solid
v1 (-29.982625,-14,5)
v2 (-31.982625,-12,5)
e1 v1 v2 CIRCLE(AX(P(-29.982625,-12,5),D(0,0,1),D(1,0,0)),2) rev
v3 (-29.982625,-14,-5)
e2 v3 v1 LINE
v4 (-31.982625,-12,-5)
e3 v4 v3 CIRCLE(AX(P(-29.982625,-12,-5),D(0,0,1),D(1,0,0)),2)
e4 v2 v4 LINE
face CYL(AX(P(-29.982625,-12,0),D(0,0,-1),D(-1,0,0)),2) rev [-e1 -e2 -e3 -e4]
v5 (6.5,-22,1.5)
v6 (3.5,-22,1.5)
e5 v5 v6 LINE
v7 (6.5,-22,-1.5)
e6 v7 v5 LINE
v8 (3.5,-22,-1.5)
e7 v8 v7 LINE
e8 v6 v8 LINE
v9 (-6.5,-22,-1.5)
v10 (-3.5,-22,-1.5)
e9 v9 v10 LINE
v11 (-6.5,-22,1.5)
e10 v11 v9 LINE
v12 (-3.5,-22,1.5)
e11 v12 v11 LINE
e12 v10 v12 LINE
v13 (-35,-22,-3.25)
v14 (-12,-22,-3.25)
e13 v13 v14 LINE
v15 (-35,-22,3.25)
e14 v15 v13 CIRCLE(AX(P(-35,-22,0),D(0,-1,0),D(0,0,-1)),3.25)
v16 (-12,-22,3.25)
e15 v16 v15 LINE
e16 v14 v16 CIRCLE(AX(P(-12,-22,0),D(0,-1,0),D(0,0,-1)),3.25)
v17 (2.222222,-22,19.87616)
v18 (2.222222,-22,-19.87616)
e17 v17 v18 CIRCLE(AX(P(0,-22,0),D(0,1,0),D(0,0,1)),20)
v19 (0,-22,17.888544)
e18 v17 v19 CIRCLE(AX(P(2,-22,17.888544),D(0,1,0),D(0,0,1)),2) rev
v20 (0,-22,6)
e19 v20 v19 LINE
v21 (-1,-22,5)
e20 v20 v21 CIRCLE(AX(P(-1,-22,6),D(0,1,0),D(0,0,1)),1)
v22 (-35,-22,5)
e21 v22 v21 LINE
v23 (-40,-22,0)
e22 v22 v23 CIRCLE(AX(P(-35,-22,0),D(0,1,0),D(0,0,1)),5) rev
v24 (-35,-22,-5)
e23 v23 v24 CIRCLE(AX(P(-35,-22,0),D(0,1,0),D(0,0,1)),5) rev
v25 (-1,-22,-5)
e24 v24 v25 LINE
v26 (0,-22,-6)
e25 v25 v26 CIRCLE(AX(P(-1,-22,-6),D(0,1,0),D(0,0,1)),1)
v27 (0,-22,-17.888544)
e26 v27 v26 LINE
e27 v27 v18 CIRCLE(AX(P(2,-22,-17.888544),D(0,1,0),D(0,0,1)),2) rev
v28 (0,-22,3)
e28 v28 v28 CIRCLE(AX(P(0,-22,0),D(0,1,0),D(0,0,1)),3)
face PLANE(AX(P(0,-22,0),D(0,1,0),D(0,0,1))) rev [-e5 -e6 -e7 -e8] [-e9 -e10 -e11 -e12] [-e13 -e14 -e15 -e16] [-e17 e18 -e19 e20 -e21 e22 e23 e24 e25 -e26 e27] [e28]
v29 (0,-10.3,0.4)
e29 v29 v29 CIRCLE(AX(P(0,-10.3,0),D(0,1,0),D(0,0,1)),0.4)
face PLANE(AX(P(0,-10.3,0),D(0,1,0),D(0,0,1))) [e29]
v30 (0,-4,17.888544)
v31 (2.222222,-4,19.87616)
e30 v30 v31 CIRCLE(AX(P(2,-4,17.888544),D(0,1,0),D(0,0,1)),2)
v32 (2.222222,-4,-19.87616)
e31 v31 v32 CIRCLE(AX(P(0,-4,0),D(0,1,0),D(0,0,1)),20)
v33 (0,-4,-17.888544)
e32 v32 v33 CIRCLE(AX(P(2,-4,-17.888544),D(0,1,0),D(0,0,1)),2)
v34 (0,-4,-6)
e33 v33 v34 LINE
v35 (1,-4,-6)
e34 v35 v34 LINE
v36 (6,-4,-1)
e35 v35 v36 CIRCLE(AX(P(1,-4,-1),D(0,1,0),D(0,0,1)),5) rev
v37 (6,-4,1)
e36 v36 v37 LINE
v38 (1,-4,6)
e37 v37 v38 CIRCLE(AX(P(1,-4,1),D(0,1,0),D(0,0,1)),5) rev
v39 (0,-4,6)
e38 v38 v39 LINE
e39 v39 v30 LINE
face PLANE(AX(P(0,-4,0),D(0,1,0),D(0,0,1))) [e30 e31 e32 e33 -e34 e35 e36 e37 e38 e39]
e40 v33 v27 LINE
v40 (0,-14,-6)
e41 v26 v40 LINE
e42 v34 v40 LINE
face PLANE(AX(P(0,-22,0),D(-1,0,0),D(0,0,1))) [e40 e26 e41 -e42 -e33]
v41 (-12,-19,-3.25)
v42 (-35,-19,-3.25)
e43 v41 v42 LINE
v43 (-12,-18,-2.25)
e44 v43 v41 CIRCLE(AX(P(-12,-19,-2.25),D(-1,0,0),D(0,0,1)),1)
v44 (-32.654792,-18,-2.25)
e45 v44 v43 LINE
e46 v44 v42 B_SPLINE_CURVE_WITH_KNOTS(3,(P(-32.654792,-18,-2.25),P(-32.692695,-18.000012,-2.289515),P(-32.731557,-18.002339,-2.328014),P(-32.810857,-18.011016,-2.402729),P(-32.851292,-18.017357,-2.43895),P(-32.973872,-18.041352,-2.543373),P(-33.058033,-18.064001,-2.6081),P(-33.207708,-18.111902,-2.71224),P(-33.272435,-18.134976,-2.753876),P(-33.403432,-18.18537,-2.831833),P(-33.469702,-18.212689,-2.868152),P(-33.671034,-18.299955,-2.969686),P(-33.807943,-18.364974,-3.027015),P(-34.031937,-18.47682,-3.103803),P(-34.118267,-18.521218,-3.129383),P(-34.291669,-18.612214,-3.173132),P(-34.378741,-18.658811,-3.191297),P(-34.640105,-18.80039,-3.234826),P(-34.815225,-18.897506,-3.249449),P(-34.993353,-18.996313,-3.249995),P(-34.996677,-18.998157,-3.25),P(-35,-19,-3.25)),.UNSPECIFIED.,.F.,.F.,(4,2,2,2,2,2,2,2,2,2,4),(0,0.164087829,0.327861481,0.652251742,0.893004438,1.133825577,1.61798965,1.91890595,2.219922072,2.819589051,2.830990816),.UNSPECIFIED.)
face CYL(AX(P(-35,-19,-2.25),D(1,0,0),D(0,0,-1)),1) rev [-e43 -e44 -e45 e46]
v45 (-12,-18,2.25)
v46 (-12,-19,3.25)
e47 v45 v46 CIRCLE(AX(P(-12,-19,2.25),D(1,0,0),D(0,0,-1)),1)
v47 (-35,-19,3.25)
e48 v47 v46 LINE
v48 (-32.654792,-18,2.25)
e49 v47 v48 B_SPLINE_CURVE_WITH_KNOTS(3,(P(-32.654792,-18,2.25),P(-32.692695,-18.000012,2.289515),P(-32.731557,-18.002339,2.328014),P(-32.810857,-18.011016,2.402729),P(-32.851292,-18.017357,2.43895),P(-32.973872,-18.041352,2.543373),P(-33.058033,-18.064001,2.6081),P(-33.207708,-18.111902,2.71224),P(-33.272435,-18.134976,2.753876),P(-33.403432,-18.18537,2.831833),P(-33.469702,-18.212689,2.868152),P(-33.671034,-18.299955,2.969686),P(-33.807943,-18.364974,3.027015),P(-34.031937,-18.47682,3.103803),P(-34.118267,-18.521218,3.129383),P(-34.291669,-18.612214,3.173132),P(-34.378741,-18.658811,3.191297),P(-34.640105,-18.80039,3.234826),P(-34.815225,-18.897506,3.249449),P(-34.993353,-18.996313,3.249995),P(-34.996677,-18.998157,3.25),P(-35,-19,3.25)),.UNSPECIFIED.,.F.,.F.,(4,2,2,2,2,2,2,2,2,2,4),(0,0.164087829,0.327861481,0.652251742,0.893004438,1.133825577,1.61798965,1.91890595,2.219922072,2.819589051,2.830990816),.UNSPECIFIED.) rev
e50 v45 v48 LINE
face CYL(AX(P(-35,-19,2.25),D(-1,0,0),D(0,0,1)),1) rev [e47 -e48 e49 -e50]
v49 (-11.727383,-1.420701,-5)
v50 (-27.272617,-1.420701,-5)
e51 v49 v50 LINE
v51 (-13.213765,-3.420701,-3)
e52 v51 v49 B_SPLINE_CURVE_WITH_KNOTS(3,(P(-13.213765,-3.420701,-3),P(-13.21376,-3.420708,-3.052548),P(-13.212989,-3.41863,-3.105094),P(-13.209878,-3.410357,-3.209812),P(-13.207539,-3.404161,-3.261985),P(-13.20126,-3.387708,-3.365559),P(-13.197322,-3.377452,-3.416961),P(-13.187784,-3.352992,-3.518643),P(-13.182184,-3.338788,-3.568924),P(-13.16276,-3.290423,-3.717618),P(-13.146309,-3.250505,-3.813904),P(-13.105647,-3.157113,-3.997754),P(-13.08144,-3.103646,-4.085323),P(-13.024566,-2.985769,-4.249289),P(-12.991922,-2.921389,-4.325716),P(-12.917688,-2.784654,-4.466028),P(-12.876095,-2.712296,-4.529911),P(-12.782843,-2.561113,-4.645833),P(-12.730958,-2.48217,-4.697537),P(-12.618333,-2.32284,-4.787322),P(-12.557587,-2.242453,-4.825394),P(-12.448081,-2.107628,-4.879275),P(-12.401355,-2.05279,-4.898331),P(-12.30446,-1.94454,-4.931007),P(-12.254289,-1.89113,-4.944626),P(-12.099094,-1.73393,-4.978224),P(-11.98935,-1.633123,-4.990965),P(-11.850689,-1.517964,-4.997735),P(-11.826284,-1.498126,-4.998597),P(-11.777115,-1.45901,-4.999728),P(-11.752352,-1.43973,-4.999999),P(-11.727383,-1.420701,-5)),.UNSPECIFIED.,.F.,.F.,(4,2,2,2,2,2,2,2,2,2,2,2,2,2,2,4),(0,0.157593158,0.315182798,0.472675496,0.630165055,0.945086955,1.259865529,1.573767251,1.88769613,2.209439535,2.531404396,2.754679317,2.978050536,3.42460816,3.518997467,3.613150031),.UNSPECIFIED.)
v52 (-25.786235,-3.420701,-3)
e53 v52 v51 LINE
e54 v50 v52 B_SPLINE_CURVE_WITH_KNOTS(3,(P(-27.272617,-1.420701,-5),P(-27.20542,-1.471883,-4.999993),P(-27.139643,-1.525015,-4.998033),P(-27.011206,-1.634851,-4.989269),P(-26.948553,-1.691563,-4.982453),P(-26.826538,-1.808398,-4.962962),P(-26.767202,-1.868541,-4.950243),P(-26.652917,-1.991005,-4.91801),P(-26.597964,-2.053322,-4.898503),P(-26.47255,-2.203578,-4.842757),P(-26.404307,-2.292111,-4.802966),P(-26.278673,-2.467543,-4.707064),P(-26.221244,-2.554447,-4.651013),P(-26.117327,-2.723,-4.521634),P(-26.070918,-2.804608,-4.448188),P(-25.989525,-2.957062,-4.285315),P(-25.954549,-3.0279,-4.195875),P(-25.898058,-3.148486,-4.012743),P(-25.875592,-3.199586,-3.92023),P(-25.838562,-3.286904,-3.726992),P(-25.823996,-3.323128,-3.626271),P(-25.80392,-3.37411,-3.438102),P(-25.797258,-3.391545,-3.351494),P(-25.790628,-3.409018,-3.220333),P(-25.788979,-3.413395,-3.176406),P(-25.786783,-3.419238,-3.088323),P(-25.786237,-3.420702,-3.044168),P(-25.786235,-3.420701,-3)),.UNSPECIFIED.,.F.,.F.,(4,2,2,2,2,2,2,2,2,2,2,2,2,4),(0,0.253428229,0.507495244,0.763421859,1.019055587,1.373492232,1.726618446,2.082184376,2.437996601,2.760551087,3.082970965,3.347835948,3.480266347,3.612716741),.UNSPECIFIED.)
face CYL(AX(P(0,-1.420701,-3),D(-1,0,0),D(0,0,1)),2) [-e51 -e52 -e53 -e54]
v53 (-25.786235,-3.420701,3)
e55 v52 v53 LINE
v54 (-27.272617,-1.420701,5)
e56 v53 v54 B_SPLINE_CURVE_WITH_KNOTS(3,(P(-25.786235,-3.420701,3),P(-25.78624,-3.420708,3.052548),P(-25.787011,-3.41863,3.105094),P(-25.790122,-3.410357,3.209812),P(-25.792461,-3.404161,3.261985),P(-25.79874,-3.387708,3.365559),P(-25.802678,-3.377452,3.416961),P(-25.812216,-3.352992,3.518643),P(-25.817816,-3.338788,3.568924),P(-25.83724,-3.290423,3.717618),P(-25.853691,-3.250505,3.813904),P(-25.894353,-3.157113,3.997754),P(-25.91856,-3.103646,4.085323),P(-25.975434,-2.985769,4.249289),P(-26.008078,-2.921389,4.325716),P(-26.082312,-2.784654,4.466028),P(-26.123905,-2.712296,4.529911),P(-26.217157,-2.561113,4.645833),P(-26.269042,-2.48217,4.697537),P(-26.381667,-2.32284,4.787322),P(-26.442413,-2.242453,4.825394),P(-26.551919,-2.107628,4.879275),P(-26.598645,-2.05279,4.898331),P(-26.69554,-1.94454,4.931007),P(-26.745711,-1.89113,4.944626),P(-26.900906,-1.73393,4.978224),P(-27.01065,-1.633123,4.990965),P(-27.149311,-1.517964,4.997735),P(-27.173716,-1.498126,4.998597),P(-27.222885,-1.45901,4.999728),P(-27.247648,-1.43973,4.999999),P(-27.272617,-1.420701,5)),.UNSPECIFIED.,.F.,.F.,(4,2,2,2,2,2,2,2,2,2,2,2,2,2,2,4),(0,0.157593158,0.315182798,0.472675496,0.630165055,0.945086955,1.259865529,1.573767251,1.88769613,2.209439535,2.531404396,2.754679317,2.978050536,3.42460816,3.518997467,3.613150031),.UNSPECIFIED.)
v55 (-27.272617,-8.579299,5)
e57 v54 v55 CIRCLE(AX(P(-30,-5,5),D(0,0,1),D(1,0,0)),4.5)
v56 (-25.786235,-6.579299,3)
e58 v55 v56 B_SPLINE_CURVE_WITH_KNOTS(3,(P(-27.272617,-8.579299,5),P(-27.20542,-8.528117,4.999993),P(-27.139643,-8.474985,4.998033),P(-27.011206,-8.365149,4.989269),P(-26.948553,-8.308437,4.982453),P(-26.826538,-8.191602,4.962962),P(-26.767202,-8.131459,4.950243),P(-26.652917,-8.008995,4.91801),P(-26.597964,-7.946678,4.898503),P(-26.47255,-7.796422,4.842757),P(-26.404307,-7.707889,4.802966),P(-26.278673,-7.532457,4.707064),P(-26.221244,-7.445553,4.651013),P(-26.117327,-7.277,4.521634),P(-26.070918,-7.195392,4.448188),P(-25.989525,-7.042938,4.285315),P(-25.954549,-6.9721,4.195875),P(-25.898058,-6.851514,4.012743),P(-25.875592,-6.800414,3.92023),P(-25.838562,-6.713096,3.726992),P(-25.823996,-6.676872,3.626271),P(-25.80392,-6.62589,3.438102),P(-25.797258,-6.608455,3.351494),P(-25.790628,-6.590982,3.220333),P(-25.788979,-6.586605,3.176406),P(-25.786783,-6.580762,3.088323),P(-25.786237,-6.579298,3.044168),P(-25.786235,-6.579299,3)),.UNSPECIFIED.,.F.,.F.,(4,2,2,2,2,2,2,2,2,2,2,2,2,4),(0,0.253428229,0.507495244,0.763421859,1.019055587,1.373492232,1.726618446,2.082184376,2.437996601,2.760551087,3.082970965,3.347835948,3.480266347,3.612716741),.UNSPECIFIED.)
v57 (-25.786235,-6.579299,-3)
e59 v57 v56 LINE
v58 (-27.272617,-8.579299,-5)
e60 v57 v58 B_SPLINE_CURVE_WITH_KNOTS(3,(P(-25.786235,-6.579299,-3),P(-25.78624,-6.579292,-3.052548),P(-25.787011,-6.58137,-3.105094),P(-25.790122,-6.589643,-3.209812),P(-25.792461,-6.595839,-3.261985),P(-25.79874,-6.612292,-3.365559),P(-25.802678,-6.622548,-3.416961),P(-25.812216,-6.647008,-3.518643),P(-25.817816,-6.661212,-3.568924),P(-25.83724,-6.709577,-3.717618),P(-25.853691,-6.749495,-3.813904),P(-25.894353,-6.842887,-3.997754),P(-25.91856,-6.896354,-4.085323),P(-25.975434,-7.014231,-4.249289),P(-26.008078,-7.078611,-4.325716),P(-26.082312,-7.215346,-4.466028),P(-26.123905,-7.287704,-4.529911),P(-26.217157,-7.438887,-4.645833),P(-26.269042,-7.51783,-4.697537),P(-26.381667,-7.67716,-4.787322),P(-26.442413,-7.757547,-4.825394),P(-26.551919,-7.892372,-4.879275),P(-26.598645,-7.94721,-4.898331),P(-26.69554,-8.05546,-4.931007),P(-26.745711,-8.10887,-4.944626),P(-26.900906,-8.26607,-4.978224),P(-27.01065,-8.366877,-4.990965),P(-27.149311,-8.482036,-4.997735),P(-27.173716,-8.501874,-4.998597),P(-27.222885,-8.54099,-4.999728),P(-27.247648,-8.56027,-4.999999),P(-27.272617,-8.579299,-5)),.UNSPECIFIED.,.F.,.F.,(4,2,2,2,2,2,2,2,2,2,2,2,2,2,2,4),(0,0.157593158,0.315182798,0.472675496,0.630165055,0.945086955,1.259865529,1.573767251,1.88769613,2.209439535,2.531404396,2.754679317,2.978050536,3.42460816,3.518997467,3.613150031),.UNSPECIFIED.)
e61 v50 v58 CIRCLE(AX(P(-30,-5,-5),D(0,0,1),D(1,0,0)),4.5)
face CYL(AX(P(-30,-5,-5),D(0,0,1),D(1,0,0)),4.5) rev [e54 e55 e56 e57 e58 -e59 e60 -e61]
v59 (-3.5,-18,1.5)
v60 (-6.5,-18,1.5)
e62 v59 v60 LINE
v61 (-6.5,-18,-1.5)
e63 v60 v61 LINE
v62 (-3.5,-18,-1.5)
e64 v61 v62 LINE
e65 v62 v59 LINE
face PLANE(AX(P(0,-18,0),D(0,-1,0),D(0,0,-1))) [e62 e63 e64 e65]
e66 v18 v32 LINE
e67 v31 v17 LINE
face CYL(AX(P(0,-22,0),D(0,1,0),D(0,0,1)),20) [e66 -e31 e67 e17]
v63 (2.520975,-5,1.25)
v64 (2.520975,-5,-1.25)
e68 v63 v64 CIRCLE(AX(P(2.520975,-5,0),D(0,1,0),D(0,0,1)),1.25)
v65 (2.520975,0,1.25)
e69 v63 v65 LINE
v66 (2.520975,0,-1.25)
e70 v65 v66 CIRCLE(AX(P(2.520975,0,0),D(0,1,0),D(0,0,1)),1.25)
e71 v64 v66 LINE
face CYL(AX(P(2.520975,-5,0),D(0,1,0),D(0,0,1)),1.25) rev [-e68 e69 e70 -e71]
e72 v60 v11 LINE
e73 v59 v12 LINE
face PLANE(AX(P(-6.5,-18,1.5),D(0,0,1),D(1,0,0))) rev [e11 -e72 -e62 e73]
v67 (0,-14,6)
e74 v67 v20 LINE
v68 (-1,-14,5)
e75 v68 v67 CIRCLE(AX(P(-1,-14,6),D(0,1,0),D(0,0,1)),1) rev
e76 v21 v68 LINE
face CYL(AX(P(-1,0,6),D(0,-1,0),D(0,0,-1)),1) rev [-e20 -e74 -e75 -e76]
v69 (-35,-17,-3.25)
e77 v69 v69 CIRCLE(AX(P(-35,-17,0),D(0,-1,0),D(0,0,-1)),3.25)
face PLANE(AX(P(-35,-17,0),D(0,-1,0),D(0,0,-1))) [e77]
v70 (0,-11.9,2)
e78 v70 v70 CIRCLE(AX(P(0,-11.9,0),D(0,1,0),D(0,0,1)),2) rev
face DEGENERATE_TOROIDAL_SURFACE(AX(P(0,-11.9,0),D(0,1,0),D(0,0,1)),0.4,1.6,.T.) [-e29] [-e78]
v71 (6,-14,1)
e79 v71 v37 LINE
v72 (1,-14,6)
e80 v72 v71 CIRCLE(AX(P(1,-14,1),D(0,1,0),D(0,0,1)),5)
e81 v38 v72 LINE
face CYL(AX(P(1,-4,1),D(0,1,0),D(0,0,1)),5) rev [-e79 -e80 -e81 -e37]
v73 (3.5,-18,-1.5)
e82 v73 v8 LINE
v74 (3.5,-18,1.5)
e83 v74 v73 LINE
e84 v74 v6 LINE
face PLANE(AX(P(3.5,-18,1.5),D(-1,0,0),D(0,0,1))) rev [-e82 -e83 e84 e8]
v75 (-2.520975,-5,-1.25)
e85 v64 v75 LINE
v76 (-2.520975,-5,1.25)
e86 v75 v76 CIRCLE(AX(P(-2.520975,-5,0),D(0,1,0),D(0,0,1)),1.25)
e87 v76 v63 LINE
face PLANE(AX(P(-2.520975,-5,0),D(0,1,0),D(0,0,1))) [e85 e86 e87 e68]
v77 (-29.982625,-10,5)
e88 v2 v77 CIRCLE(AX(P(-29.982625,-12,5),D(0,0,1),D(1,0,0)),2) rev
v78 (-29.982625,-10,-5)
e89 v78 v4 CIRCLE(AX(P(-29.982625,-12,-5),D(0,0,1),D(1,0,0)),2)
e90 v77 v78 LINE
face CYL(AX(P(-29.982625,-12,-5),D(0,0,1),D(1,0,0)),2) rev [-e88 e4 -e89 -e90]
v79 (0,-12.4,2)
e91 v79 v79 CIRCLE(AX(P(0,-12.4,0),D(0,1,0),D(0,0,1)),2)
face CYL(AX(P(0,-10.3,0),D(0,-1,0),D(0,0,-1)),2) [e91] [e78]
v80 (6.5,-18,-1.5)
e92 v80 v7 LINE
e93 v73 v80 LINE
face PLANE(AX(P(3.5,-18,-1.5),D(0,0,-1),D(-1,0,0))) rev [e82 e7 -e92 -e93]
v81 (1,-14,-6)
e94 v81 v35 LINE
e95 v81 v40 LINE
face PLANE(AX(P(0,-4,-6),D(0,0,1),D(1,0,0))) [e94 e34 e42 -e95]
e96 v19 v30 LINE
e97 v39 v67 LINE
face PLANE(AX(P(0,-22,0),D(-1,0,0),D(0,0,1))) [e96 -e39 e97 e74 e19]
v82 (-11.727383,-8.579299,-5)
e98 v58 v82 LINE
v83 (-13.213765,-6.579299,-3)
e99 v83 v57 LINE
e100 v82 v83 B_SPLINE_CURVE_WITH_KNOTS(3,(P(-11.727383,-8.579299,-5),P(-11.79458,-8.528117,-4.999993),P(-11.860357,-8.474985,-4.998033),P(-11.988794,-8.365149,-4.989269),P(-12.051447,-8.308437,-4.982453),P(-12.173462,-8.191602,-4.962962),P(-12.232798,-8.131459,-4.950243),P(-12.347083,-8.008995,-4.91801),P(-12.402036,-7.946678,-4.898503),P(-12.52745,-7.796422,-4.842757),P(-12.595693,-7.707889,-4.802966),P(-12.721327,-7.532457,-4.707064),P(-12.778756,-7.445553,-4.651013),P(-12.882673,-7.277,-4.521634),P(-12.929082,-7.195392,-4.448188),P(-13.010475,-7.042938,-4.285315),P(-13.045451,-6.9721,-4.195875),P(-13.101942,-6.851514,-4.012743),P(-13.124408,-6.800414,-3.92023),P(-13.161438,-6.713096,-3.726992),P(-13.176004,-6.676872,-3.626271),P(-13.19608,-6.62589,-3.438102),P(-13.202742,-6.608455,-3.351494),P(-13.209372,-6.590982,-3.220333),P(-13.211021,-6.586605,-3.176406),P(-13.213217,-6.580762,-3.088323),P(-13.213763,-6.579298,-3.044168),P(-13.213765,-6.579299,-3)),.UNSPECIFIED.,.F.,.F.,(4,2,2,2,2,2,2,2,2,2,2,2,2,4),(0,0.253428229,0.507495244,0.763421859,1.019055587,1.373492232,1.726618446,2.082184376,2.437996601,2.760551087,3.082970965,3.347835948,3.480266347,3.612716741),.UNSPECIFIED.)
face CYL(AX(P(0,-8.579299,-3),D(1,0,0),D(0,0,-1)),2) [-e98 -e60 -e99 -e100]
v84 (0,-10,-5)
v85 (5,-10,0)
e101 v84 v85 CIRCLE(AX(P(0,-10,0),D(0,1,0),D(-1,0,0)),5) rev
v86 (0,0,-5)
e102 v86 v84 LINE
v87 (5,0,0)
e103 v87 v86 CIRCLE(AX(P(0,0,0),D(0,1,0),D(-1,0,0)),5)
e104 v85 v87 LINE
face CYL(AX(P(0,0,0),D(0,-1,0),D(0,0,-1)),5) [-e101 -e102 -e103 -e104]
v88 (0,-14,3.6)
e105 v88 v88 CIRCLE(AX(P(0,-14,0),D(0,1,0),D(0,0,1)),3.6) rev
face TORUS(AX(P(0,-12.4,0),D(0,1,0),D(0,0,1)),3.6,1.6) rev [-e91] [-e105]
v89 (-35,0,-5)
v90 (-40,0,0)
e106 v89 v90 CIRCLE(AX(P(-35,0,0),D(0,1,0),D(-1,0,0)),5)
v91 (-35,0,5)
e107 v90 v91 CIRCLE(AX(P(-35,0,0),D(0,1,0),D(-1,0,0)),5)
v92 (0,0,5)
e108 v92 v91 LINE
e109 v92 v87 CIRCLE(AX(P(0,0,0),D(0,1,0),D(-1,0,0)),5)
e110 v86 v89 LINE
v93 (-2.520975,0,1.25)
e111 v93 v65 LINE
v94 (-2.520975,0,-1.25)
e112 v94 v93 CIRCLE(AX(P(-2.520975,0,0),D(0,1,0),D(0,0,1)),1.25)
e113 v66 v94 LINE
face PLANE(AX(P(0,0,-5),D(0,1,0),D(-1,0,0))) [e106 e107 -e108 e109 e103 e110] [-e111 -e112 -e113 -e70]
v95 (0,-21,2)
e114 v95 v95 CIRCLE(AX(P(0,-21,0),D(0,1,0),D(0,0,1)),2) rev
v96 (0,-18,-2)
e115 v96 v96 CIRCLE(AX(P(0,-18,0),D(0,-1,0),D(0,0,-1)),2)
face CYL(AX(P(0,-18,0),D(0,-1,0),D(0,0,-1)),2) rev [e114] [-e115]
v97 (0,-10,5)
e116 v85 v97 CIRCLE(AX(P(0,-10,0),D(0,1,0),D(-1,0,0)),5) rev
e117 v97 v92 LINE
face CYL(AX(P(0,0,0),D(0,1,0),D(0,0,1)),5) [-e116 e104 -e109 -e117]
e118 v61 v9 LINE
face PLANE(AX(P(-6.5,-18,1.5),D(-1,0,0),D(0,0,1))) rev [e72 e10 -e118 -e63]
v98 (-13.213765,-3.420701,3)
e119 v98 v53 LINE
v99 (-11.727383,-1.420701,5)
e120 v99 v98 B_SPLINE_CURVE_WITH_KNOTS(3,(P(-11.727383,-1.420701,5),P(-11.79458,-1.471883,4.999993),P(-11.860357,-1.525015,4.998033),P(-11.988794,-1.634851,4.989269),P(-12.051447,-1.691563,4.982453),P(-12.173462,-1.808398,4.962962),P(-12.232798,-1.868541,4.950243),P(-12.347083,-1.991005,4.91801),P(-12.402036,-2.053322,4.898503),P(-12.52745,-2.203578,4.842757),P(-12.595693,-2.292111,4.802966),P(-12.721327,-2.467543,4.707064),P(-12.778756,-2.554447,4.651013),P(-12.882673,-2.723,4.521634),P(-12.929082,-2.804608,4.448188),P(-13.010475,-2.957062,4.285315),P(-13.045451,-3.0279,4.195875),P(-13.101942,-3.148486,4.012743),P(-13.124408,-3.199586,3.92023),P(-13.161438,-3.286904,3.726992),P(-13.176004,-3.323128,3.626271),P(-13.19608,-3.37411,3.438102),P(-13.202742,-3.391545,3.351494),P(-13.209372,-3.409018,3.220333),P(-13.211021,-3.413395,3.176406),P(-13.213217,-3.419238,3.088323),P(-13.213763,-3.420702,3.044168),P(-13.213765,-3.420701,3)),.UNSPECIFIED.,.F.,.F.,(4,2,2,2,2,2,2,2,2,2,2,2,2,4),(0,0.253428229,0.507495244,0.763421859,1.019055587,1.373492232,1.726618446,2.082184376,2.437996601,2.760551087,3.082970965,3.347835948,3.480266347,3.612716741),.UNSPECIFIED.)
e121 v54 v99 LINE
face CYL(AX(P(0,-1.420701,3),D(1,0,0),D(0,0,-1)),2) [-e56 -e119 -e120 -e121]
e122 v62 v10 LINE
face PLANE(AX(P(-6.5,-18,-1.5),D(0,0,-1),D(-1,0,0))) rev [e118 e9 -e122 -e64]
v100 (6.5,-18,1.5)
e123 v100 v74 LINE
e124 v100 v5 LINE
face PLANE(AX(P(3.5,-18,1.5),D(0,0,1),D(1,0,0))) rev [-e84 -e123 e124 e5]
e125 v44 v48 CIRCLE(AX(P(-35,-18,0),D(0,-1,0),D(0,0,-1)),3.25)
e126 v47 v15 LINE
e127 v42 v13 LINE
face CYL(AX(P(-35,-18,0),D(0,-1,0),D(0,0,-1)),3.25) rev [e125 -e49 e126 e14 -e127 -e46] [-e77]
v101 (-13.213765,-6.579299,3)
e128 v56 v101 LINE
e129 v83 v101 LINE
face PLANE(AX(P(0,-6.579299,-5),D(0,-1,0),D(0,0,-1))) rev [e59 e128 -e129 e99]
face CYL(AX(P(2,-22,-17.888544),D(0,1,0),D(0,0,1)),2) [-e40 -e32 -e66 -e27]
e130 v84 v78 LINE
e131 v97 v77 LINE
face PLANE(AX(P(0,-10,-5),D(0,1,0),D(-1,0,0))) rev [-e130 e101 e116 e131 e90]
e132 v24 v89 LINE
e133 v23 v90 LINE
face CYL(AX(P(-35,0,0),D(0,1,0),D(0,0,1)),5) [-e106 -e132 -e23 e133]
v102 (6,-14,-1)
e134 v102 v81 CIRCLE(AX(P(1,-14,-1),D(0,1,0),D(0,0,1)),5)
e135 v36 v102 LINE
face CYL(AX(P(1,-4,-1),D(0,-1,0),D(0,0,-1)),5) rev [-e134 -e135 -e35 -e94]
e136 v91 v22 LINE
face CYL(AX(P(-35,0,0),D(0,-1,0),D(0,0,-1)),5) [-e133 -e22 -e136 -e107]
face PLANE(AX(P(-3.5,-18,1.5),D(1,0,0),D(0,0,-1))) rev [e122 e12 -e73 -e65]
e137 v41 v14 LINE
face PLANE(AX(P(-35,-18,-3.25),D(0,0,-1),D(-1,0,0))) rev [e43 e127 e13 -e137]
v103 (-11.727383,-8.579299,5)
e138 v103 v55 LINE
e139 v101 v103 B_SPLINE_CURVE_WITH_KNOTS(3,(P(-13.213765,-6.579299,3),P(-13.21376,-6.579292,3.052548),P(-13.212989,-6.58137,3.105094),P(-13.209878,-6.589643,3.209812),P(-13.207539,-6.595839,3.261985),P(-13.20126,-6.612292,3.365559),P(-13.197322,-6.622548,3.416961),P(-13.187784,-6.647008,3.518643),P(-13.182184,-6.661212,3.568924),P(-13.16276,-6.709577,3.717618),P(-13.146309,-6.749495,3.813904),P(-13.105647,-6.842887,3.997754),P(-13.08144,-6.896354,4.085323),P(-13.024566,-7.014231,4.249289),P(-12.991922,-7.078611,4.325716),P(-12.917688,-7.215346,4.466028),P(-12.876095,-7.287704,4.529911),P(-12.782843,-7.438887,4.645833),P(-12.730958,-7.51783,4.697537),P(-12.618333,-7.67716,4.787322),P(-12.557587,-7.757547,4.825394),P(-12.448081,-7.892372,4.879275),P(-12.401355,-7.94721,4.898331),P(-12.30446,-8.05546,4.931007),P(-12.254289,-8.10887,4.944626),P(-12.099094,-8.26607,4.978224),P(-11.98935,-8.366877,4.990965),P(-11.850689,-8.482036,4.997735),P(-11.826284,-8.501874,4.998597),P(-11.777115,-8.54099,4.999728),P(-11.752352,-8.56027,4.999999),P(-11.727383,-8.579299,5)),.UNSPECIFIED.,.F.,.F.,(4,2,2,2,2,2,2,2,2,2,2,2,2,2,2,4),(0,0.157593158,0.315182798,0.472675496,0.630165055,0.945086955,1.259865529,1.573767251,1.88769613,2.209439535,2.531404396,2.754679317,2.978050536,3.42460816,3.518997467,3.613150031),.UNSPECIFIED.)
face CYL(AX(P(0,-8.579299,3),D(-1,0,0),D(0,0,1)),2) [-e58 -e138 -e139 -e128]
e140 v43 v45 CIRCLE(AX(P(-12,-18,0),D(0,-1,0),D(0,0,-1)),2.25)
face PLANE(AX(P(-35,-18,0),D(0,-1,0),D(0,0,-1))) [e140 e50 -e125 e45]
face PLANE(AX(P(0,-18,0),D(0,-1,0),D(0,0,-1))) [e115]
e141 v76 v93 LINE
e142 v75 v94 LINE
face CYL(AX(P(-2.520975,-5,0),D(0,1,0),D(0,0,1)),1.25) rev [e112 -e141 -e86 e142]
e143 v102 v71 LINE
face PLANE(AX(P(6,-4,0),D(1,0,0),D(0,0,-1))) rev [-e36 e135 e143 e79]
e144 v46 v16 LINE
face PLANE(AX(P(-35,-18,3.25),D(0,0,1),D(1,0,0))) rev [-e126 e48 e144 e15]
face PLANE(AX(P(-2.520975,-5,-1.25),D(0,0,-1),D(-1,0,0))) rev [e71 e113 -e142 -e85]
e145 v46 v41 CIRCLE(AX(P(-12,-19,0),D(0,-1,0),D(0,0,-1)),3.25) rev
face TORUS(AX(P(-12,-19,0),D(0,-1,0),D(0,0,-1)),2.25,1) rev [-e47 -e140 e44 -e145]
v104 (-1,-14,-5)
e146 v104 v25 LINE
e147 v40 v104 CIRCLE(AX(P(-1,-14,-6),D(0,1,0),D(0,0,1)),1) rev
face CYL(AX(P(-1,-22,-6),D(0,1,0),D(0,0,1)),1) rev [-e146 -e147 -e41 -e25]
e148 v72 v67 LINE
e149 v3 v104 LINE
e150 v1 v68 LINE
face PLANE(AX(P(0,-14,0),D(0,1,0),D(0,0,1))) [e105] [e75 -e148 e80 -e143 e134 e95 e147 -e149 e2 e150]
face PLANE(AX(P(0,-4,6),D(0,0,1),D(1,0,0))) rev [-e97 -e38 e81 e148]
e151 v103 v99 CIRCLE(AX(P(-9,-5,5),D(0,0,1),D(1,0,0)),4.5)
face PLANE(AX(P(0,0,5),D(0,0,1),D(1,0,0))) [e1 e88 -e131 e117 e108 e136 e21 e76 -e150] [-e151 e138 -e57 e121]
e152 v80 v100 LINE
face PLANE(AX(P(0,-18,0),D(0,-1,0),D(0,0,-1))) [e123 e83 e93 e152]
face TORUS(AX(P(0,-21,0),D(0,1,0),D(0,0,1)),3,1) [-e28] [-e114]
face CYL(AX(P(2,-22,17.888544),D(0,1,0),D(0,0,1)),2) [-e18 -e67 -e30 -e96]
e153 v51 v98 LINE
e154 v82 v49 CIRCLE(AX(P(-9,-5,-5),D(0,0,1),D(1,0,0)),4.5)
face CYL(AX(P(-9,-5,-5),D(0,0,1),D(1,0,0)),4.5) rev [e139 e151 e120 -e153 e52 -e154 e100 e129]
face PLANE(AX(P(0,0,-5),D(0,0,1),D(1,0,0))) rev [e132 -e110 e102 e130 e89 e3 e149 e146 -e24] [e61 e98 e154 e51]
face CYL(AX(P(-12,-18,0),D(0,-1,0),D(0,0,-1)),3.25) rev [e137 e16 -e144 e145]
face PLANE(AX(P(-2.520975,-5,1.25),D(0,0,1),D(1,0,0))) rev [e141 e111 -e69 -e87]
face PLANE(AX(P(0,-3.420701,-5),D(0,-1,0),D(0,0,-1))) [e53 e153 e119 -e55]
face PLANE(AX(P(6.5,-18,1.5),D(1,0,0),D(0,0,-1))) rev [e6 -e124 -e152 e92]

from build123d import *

# Parameters (mm, degrees)
BOSS_EXTRUDE1_DEPTH      = 5
BOSS_EXTRUDE1_DEPTH_BACK = 5
CUT_EXTRUDE1_DEPTH       = 5
BOSS_EXTRUDE2_START      = -14
SKETCH3_W                = 5.881583951
SKETCH3_H                = 10
BOSS_EXTRUDE2_DEPTH      = 8
BOSS_EXTRUDE3_START      = 10
BOSS_EXTRUDE3_DEPTH      = 10
FILLET2_R                = 5
FILLET3_R                = 2
SKETCH5_R                = 2
SKETCH5_W                = 3
SKETCH5_H                = 3
CUT_EXTRUDE2_DEPTH       = 4
FILLET4_R                = 1
SKETCH6_R                = 3.25
CUT_EXTRUDE3_DEPTH       = 5
BOSS_EXTRUDE4_START      = -14
SKETCH7_R                = 2
BOSS_EXTRUDE4_DEPTH      = 3.7
FILLET5_R                = 1.6


with BuildPart() as part:
    # Sketch1 → Boss-Extrude1 (new, two sides: drawn at the far end of the back side and taken through both)
    with BuildSketch(Plane.XY.offset(-BOSS_EXTRUDE1_DEPTH_BACK)):
        Polygon((5, -10), (5, 0), (0, 0), (-5, 0), (-35, 0), (-40, 0), (-40, -14), (-31.982625312, -14), (-31.982625312, -10), (-5, -10), align=None)
        with BuildLine():
            ThreePointArc((-25.78623506, -6.579298906), (-34.5, -5), (-25.78623506, -3.420701094))
            Line((-25.78623506, -3.420701094), (-13.21376494, -3.420701094))
            ThreePointArc((-13.21376494, -3.420701094), (-8.197485897, -0.572136959), (-4.5, -5))
            ThreePointArc((-4.5, -5), (-8.197485897, -9.427863041), (-13.21376494, -6.579298906))
            Line((-13.21376494, -6.579298906), (-25.78623506, -6.579298906))
        make_face(mode=Mode.SUBTRACT)
    extrude(amount=BOSS_EXTRUDE1_DEPTH + BOSS_EXTRUDE1_DEPTH_BACK)

    # Sketch2 → Cut-Extrude1 (cut)
    with BuildSketch(Plane(origin=(0, 0, 0), x_dir=(1, 0, 0), z_dir=(0, 1, 0))):
        with BuildLine():
            Line((-2.520975228, 1.25), (2.520975228, 1.25))
            ThreePointArc((2.520975228, 1.25), (3.770975228, 0), (2.520975228, -1.25))
            Line((2.520975228, -1.25), (-2.520975228, -1.25))
            ThreePointArc((-2.520975228, -1.25), (-3.770975228, 0), (-2.520975228, 1.25))
        make_face()
    extrude(amount=-CUT_EXTRUDE1_DEPTH, mode=Mode.SUBTRACT)

    # Sketch3 → Boss-Extrude2 (add)
    with BuildSketch(Plane(origin=(0, 0, 0), x_dir=(1, 0, 0), z_dir=(0, 1, 0)).offset(BOSS_EXTRUDE2_START)):
        with BuildLine():
            Line((0, 20), (0, 5))
            Line((0, 5), (5.881583951, 5))
            Line((5.881583951, 5), (5.881583951, -5))
            Line((5.881583951, -5), (0, -5))
            Line((0, -5), (0, -20))
            ThreePointArc((0, -20), (14.142135624, -14.142135624), (20, 0))
            ThreePointArc((20, 0), (14.142135624, 14.142135624), (0, 20))
        make_face()
        with Locations((2.940791976, 0)):
            Rectangle(SKETCH3_W, SKETCH3_H)
        with BuildLine():
            Line((0, 5), (-19.364916731, 5))
            ThreePointArc((-19.364916731, 5), (-20, 0), (-19.364916731, -5))
            Line((-19.364916731, -5), (0, -5))
            Line((0, -5), (0, 5))
        make_face()
        with BuildLine():
            Line((-19.364916731, 5), (-40, 5))
            Line((-40, 5), (-40, -5))
            Line((-40, -5), (-19.364916731, -5))
            ThreePointArc((-19.364916731, -5), (-20, 0), (-19.364916731, 5))
        make_face()
    extrude(amount=-BOSS_EXTRUDE2_DEPTH)

    # Sketch4 → Boss-Extrude3 (add)
    with BuildSketch(Plane(origin=(0, -14, 0), x_dir=(1, 0, 0), z_dir=(0, 1, 0)).offset(BOSS_EXTRUDE3_START)):
        with BuildLine():
            ThreePointArc((20, 0), (14.142135624, 14.142135624), (0, 20))
            Line((0, 20), (0, 6))
            Line((0, 6), (6, 6))
            Line((6, 6), (6, -6))
            Line((6, -6), (0, -6))
            Line((0, -6), (0, -20))
            ThreePointArc((0, -20), (14.142135624, -14.142135624), (20, 0))
        make_face()
    extrude(amount=-BOSS_EXTRUDE3_DEPTH)

    # Fillet2
    fillet2_edges = [part.edges().sort_by_distance(p)[0] for p in [
        (-40, -11, -5),
        (-40, -11, 5),
        (6, -9, 6),
        (6, -9, -6),
        (5, -5, 5),
        (5, -5, -5),
    ]]
    fillet(fillet2_edges, radius=FILLET2_R - 0.0001)  # a hair under: the kernel refuses the full size

    # Fillet3
    fillet3_edges = [part.edges().sort_by_distance(p)[0] for p in [
        (-19.5, -3.420701094, 5),
        (-19.5, -3.420701094, -5),
        (-19.5, -6.579298906, 5),
        (-19.5, -6.579298906, -5),
        (-31.982625312, -10, 0),
        (-31.982625312, -14, 0),
        (0, -13, -20),
        (0, -13, 20),
    ]]
    fillet(fillet3_edges, radius=FILLET3_R - 0.0001)  # a hair under: the kernel refuses the full size

    # Sketch5 → Cut-Extrude2 (cut)
    with BuildSketch(Plane.XZ.offset(22)):
        with Locations(Location((0, 0, 0), (0, 0, 270))):
            Circle(SKETCH5_R)
        with BuildLine():
            Line((-35, 3.25), (-12, 3.25))
            ThreePointArc((-12, 3.25), (-8.75, 0), (-12, -3.25))
            Line((-12, -3.25), (-35, -3.25))
            ThreePointArc((-35, -3.25), (-38.25, 0), (-35, 3.25))
        make_face()
        with Locations((-5, 0)):
            Rectangle(SKETCH5_W, SKETCH5_H)
        with Locations((5, 0)):
            Rectangle(SKETCH5_W, SKETCH5_H)
    extrude(amount=-CUT_EXTRUDE2_DEPTH, mode=Mode.SUBTRACT)

    # Fillet4
    fillet4_edges = [part.edges().sort_by_distance(p)[0] for p in [
        (-23.5, -18, 3.25),
        (-8.75, -18, 0),
        (-23.5, -18, -3.25),
        (-38.25, -18, 0),
        (0, -18, -5),
        (0, -18, 5),
        (0, -22, 2),
    ]]
    fillet(fillet4_edges, radius=FILLET4_R)

    # Sketch6 → Cut-Extrude3 (cut)
    with BuildSketch(Plane.XZ.offset(22)):
        with Locations(Location((-35, 0, 0), (0, 0, 270))):
            Circle(SKETCH6_R)
    extrude(amount=-CUT_EXTRUDE3_DEPTH, mode=Mode.SUBTRACT)

    # Sketch7 → Boss-Extrude4 (add)
    with BuildSketch(Plane(origin=(0, 0, 0), x_dir=(1, 0, 0), z_dir=(0, 1, 0)).offset(BOSS_EXTRUDE4_START)):
        with Locations(Location((0, 0, 0), (0, 0, 90))):
            Circle(SKETCH7_R)
    extrude(amount=BOSS_EXTRUDE4_DEPTH)

    # Fillet5
    fillet5_edges = [part.edges().sort_by_distance(p)[0] for p in [
        (0, -14, 2),
        (0, -10.3, 2),
    ]]
    fillet(fillet5_edges, radius=FILLET5_R)


solid = part.part
